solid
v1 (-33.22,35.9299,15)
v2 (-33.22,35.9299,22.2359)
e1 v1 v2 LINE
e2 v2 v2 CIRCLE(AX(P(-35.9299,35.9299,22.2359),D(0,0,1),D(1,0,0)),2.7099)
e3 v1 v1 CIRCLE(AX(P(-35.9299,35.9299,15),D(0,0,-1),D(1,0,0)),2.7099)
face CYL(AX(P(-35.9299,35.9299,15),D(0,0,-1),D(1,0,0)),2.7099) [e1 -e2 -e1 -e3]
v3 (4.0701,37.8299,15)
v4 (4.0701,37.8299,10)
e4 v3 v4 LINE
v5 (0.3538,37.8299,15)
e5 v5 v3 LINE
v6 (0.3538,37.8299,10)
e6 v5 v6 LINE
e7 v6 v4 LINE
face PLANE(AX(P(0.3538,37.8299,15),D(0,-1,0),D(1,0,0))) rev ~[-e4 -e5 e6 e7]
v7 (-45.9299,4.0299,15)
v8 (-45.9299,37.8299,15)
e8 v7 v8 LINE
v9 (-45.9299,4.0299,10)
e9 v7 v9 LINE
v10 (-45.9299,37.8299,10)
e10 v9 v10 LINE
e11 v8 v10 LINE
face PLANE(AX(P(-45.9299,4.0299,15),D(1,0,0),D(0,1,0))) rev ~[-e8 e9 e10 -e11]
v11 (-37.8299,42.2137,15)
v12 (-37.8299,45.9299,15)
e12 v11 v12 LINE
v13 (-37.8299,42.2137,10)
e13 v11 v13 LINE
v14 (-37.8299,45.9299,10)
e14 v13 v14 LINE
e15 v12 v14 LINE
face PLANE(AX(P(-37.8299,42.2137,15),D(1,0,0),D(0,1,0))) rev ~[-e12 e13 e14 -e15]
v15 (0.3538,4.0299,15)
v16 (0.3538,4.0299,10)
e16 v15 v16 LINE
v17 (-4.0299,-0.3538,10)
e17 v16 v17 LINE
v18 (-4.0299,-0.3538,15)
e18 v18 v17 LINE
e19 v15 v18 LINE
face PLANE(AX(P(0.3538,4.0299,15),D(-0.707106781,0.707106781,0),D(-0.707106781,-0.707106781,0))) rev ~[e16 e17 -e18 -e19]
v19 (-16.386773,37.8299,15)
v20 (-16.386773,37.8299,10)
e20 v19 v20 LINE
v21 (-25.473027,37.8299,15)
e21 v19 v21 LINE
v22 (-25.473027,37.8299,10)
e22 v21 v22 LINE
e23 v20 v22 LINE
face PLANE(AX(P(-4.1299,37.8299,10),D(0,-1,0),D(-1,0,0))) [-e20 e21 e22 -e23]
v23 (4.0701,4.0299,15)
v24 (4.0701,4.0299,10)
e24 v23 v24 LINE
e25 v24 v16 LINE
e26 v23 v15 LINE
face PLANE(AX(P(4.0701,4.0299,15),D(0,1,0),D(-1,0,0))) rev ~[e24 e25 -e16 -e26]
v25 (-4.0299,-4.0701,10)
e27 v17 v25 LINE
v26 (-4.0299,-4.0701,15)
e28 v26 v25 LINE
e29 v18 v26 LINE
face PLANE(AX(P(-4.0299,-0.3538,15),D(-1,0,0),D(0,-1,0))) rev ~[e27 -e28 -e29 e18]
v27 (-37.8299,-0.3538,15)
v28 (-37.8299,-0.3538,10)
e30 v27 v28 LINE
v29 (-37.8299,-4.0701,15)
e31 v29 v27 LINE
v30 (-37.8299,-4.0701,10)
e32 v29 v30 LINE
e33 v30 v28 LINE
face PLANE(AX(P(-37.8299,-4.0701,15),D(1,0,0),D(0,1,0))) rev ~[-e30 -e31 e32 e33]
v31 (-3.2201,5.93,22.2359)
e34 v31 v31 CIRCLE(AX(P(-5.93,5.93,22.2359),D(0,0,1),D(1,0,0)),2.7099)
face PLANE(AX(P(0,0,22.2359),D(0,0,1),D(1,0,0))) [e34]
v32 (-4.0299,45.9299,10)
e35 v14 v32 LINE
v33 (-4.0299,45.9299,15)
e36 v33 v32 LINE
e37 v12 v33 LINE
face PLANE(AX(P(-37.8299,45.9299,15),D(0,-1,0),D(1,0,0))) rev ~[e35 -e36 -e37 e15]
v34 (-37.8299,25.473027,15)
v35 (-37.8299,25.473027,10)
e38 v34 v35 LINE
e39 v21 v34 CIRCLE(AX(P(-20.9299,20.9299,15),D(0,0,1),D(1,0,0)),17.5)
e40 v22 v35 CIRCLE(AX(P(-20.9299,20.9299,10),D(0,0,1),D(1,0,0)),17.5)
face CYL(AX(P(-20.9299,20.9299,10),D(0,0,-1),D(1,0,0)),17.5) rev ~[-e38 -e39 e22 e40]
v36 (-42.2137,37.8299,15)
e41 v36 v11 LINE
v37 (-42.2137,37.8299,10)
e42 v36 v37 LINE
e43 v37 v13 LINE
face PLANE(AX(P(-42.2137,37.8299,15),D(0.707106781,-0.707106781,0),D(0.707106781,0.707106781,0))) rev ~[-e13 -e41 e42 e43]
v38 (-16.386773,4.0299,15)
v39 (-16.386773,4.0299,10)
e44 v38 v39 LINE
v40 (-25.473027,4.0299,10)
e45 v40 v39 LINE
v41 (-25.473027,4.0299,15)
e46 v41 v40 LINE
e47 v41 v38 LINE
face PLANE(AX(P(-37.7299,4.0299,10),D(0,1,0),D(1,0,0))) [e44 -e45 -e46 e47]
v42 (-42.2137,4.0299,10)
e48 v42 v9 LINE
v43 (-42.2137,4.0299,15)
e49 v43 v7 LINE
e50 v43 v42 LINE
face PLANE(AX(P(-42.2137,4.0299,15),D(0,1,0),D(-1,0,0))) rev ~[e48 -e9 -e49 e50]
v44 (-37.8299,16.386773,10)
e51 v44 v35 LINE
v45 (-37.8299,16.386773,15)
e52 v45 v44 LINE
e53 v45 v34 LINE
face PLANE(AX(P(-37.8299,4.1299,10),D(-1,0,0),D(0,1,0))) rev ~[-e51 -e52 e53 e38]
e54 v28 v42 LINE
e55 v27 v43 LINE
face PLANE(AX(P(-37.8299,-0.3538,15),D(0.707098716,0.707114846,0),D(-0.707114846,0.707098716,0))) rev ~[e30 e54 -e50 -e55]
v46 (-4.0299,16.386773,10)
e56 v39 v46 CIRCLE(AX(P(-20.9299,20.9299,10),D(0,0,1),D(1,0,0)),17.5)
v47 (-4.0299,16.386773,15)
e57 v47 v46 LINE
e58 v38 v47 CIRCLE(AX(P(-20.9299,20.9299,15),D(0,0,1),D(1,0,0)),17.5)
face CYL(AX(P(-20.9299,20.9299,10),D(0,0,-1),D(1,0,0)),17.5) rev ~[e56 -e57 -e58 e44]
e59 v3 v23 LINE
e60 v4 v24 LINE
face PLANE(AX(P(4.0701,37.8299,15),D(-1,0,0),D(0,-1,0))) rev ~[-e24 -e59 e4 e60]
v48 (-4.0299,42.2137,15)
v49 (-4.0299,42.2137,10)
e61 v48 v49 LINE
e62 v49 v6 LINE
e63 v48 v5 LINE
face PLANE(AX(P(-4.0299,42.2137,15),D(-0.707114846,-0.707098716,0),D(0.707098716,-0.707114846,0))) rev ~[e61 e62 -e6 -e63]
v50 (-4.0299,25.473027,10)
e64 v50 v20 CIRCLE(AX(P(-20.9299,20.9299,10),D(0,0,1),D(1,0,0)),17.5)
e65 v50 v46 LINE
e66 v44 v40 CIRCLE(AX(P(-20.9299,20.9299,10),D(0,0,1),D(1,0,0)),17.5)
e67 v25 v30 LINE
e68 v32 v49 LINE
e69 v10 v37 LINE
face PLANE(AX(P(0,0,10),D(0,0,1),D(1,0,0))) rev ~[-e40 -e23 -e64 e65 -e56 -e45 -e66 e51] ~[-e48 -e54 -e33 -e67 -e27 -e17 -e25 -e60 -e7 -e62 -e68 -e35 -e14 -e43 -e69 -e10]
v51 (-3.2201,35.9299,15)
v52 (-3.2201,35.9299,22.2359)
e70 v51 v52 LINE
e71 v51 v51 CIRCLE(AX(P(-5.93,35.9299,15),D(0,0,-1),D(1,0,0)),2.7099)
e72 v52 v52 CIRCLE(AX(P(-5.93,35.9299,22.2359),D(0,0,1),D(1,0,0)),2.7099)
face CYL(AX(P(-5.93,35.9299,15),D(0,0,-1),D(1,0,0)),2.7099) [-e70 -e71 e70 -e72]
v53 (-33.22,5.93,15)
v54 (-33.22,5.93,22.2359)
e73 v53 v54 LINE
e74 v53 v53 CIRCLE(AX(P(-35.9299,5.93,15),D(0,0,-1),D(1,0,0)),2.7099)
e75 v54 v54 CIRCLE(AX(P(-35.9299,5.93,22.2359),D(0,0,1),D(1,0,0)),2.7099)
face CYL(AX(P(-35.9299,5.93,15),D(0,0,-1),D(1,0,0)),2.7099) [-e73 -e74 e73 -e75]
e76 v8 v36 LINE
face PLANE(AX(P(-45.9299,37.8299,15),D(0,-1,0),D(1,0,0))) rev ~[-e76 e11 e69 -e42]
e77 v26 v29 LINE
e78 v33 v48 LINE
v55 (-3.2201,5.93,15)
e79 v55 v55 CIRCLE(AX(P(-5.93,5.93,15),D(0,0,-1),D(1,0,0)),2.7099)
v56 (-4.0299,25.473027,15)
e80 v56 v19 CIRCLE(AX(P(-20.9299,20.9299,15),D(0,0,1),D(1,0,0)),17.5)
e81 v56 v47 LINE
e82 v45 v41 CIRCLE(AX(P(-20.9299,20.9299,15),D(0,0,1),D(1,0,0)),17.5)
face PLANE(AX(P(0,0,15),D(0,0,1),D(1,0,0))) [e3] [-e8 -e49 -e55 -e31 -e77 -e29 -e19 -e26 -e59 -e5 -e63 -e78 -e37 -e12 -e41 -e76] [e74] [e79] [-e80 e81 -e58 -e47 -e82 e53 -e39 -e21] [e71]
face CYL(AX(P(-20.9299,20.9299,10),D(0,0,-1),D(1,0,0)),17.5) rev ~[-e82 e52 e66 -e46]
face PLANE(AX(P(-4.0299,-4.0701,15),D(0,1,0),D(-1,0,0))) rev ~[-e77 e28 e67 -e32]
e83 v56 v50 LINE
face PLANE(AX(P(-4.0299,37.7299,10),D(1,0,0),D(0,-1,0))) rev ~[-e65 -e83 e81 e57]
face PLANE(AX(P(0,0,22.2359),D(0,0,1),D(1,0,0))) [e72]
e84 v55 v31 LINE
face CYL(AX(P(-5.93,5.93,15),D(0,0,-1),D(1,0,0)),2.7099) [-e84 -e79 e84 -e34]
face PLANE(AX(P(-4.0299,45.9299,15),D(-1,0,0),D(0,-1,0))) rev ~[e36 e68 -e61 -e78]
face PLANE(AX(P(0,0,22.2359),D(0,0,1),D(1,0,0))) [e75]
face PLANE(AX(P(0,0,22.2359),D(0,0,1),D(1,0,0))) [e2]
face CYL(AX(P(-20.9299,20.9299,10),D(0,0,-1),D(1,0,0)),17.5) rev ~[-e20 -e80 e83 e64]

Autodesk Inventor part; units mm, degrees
ref_plane "YZ Plane" through (0, 0, 0) normal (1, 0, 0) x (0, 1, 0)
ref_plane "XZ Plane" through (0, 0, 0) normal (0, 1, 0) x (-1, 0, 0)
ref_plane "Work Plane1" through (0, 0, 10) normal (0, 0, 1) x (1, 0, 0)
sketch "Sketch1" plane through (0, 0, 10) normal (0, 0, 1) x (1, 0, 0)
  line L0 (-4.0299, -0.3538) -> (-2.2322, 1.4439) construction
  arc A0 (-1.4439, 2.2322) -> (-2.2322, 1.4439) centre (-0.9299, 0.9299) ccw construction
  line L1 (-1.4439, 2.2322) -> (0.3538, 4.0299) construction
  line L2 (-37.8299, 42.8299) -> (-37.8299, 37.8299) construction
  line L3 (-37.8299, 37.8299) -> (-42.9208, 37.8299) construction
  line L4 (-37.8299, 42.2137) -> (-37.8299, 45.8299) construction
  line L5 (-37.8299, 45.8299) -> (-4.0299, 45.8299) construction
  line L6 (-4.0299, 45.8299) -> (-4.0299, 42.2137) construction
  line L7 (-4.0299, 4.0299) -> (0.3538, 4.0299) projected
  circle A1 centre (-20.9299, 20.9299) radius 17.5 projected
  line L8 (-20.9299, 58.9723) -> (17.1124, 20.9299) construction
  line L9 (17.1124, 20.9299) -> (-20.9299, -17.1124) construction
  line L10 (-20.9299, -17.1124) -> (-58.9723, 20.9299) construction
  line L11 (-58.9723, 20.9299) -> (-20.9299, 58.9723) construction
  line L12 (-20.9299, 58.9723) -> (-20.9299, -17.1124) construction
  line L13 (17.1124, 20.9299) -> (-58.9723, 20.9299) construction
  line L14 (-20.9299, 58.9723) -> (32.8701, 58.9723) construction
  line L15 (-43.4299, 43.4299) -> (1.5701, 43.4299) construction
  line L16 (1.5701, 43.4299) -> (1.5701, -1.5701) construction
  line L17 (1.5701, -1.5701) -> (-43.4299, -1.5701) construction
  line L18 (-43.4299, -1.5701) -> (-43.4299, 43.4299) construction
  line L19 (-43.4299, 43.4299) -> (1.5701, -1.5701) construction
  line L20 (1.5701, 43.4299) -> (-43.4299, -1.5701) construction
  line L21 (-43.4299, 5.3876) -> (-43.4299, 36.4723)
  line L22 (-43.4299, 36.4723) -> (-36.4723, 43.4299)
  line L23 (-36.4723, 43.4299) -> (-5.3876, 43.4299)
  line L24 (-5.3876, 43.4299) -> (1.5701, 36.4723)
  line L25 (1.5701, 36.4723) -> (1.5701, 5.3876)
  line L26 (1.5701, 5.3876) -> (-5.3876, -1.5701)
  line L27 (-5.3876, -1.5701) -> (-36.4723, -1.5701)
  line L28 (-36.4723, -1.5701) -> (-43.4299, 5.3876)
  line L29 (-4.0299, 42.2137) -> (-37.8299, 42.2137) projected
  line L30 (-4.0299, -0.3538) -> (-4.0299, 4.0299) projected
  point P0 (-37.8299, 4.0299)
  point P1 (-20.9299, 20.9299)
  dimension "d18" = 53.8
  dimension "d19" = 45
  dimension "d20" = 53.8
  dimension "d21" = 45
  dimension "d22" = 45
extrude "Extrusion1" add sketch "Sketch1" along normal blind 5
sketch "Sketch2" plane through (0, 0, 15) normal (0, 0, 1) x (1, 0, 0)
  circle A0 centre (-35.9299, 35.9299) radius 3.0099 construction
  circle A1 centre (-5.93, 35.9299) radius 3.0099 construction
  circle A2 centre (-5.93, 5.93) radius 3.0099 construction
  circle A3 centre (-35.9299, 5.93) radius 3.0099 construction
  circle A4 centre (-35.9299, 35.9299) radius 2.7099
  circle A5 centre (-5.93, 35.9299) radius 2.7099
  circle A6 centre (-5.93, 5.93) radius 2.7099
  circle A7 centre (-35.9299, 5.93) radius 2.7099
  point P0 (0, 0)
  dimension "d_1" = 0.3
  dimension "d13" = 0.3
  dimension "d14" = 0.3
  dimension "d15" = 0.3
ref_plane "Work Plane2" through (-40.9959, 0.8639, 22.2359) normal (0, 0, 1) x (1, 0, 0)
extrude "Extrusion2" add sketch "Sketch2" along normal up to surface (7.2359 mm away)
sketch "Sketch3" plane through (0, 0, 10) normal (0, 0, -1) x (-1, 0, 0)
  line L0 (37.8299, -0.4701) -> (37.8299, 4.0299) construction
  line L1 (4.0299, 4.0299) -> (4.0299, -0.4701) construction
  line L2 (37.8299, -0.4701) -> (37.8299, 1.1886) construction
  line L3 (4.0299, -3.9701) -> (4.0299, -0.3538) construction
  line L4 (45.8299, 4.0299) -> (42.2137, 4.0299) construction
  line L5 (-0.3538, 4.0299) -> (-3.9701, 4.0299) construction
  line L6 (-3.9701, 37.8299) -> (-0.3538, 37.8299) construction
  line L7 (4.0299, 42.2137) -> (4.0299, 45.8299) construction
  line L8 (37.8299, 45.8299) -> (37.8299, 42.2137) construction
  line L9 (42.2137, 37.8299) -> (45.8299, 37.8299) construction
  line L10 (37.8299, 37.7299) -> (45.8299, 37.7299)
  line L11 (45.8299, 37.7299) -> (45.8299, 4.1299)
  line L12 (45.8299, 4.1299) -> (37.8299, 4.1299)
  line L13 (37.8299, 4.1299) -> (37.8299, 37.7299)
  line L14 (37.7299, 4.0299) -> (4.1299, 4.0299)
  line L15 (4.1299, 4.0299) -> (4.1299, -3.9701)
  line L16 (4.1299, -3.9701) -> (37.7299, -3.9701)
  line L17 (37.7299, -3.9701) -> (37.7299, 4.0299)
  line L18 (4.0299, 4.1299) -> (-3.9701, 4.1299)
  line L19 (-3.9701, 4.1299) -> (-3.9701, 37.7299)
  line L20 (-3.9701, 37.7299) -> (4.0299, 37.7299)
  line L21 (4.0299, 37.7299) -> (4.0299, 4.1299)
  line L22 (4.1299, 37.8299) -> (37.7299, 37.8299)
  line L23 (37.7299, 37.8299) -> (37.7299, 45.8299)
  line L24 (37.7299, 45.8299) -> (4.1299, 45.8299)
  line L25 (4.1299, 45.8299) -> (4.1299, 37.8299)
  point P0 (0, 0)
  dimension "d23" = 0.1
  dimension "d24" = 0.1
  dimension "d25" = 0.1
  dimension "d26" = 0.1
  dimension "d27" = 0.1
extrude "Extrusion3" add sketch "Sketch3" against normal up to surface (5 mm away)
sketch "Sketch4" plane through (0, 0, 15) normal (0, 0, 1) x (1, 0, 0)
  arc A0 (-16.3868, 4.0299) -> (-4.0299, 16.3868) centre (-20.9299, 20.9299) ccw projected
  line L0 (-25.4731, 4.0299) -> (-16.3868, 4.0299) projected
  arc A1 (-37.8299, 16.3868) -> (-25.4731, 4.0299) centre (-20.9299, 20.9299) ccw projected
  line L1 (-37.8299, 25.4731) -> (-37.8299, 16.3868) projected
  arc A2 (-25.4731, 37.8299) -> (-37.8299, 25.4731) centre (-20.9299, 20.9299) ccw projected
  line L2 (-16.3868, 37.8299) -> (-25.4731, 37.8299) projected
  arc A3 (-4.0299, 25.4731) -> (-16.3868, 37.8299) centre (-20.9299, 20.9299) ccw projected
  line L3 (-4.0299, 16.3868) -> (-4.0299, 25.4731) projected
  circle A4 centre (-5.93, 5.93) radius 2.7099 projected
  circle A5 centre (-5.93, 35.9299) radius 2.7099 projected
  circle A6 centre (-35.9299, 35.9299) radius 2.7099 projected
  circle A7 centre (-35.9299, 5.93) radius 2.7099 projected
  line L4 (3.9701, 4.1299) -> (0.3124, 4.1299) projected
  line L5 (3.9701, 37.7299) -> (3.9701, 4.1299) projected
  line L6 (0.3124, 37.7299) -> (3.9701, 37.7299) projected
  line L7 (0.3124, 37.7299) -> (-4.1299, 42.1723) projected
  line L8 (-4.1299, 45.8299) -> (-4.1299, 42.1723) projected
  line L9 (-37.7299, 45.8299) -> (-4.1299, 45.8299) projected
  line L10 (-37.7299, 42.1723) -> (-37.7299, 45.8299) projected
  line L11 (-37.7299, 42.1723) -> (-42.1723, 37.7299) projected
  line L12 (-45.8299, 37.7299) -> (-42.1723, 37.7299) projected
  line L13 (-45.8299, 4.1299) -> (-45.8299, 37.7299) projected
  line L14 (-42.1723, 4.1299) -> (-45.8299, 4.1299) projected
  line L15 (-42.1723, 4.1299) -> (-37.7299, -0.3124) projected
  line L16 (-37.7299, -3.9701) -> (-37.7299, -0.3124) projected
  line L17 (-4.1299, -3.9701) -> (-37.7299, -3.9701) projected
  line L18 (-4.1299, -0.3124) -> (-4.1299, -3.9701) projected
  line L19 (-4.1299, -0.3124) -> (0.3124, 4.1299) projected
  line L20 (-4.0299, 45.9299) -> (-4.0299, 42.2137)
  line L21 (-4.0299, 42.2137) -> (0.3538, 37.8299)
  line L22 (0.3538, 37.8299) -> (4.0701, 37.8299)
  line L23 (4.0701, 37.8299) -> (4.0701, 4.0299)
  line L24 (4.0701, 4.0299) -> (0.3538, 4.0299)
  line L25 (0.3538, 4.0299) -> (-4.0299, -0.3538)
  line L26 (-4.0299, -0.3538) -> (-4.0299, -4.0701)
  line L27 (-4.0299, -4.0701) -> (-37.8299, -4.0701)
  line L28 (-37.8299, -4.0701) -> (-37.8299, -0.3538)
  line L29 (-37.8299, -0.3538) -> (-42.2137, 4.0299)
  line L30 (-42.2137, 4.0299) -> (-45.9299, 4.0299)
  line L31 (-45.9299, 4.0299) -> (-45.9299, 37.8299)
  line L32 (-45.9299, 37.8299) -> (-42.2137, 37.8299)
  line L33 (-42.2137, 37.8299) -> (-37.8299, 42.2137)
  line L34 (-37.8299, 42.2137) -> (-37.8299, 45.9299)
  line L35 (-37.8299, 45.9299) -> (-4.0299, 45.9299)
  point P0 (0, 0)
  dimension "d18" = 53.8
  dimension "d19" = 45
  dimension "d20" = 53.8
  dimension "d21" = 45
  dimension "d22" = 45
  dimension "d30" = 0.1
extrude "Extrusion4" add sketch "Sketch4" against normal up to surface (5 mm away) contours L20 L21 L22 L23 L24 L25 L26 L27 L28 L29 L30 L31 L32 L33 L34 L35
equation "\"d13\" = d_1"
equation "\"d14\" = d_1"
equation "\"d15\" = d_1"
properties part number "50_Cube_Insert_Thorlabs"
